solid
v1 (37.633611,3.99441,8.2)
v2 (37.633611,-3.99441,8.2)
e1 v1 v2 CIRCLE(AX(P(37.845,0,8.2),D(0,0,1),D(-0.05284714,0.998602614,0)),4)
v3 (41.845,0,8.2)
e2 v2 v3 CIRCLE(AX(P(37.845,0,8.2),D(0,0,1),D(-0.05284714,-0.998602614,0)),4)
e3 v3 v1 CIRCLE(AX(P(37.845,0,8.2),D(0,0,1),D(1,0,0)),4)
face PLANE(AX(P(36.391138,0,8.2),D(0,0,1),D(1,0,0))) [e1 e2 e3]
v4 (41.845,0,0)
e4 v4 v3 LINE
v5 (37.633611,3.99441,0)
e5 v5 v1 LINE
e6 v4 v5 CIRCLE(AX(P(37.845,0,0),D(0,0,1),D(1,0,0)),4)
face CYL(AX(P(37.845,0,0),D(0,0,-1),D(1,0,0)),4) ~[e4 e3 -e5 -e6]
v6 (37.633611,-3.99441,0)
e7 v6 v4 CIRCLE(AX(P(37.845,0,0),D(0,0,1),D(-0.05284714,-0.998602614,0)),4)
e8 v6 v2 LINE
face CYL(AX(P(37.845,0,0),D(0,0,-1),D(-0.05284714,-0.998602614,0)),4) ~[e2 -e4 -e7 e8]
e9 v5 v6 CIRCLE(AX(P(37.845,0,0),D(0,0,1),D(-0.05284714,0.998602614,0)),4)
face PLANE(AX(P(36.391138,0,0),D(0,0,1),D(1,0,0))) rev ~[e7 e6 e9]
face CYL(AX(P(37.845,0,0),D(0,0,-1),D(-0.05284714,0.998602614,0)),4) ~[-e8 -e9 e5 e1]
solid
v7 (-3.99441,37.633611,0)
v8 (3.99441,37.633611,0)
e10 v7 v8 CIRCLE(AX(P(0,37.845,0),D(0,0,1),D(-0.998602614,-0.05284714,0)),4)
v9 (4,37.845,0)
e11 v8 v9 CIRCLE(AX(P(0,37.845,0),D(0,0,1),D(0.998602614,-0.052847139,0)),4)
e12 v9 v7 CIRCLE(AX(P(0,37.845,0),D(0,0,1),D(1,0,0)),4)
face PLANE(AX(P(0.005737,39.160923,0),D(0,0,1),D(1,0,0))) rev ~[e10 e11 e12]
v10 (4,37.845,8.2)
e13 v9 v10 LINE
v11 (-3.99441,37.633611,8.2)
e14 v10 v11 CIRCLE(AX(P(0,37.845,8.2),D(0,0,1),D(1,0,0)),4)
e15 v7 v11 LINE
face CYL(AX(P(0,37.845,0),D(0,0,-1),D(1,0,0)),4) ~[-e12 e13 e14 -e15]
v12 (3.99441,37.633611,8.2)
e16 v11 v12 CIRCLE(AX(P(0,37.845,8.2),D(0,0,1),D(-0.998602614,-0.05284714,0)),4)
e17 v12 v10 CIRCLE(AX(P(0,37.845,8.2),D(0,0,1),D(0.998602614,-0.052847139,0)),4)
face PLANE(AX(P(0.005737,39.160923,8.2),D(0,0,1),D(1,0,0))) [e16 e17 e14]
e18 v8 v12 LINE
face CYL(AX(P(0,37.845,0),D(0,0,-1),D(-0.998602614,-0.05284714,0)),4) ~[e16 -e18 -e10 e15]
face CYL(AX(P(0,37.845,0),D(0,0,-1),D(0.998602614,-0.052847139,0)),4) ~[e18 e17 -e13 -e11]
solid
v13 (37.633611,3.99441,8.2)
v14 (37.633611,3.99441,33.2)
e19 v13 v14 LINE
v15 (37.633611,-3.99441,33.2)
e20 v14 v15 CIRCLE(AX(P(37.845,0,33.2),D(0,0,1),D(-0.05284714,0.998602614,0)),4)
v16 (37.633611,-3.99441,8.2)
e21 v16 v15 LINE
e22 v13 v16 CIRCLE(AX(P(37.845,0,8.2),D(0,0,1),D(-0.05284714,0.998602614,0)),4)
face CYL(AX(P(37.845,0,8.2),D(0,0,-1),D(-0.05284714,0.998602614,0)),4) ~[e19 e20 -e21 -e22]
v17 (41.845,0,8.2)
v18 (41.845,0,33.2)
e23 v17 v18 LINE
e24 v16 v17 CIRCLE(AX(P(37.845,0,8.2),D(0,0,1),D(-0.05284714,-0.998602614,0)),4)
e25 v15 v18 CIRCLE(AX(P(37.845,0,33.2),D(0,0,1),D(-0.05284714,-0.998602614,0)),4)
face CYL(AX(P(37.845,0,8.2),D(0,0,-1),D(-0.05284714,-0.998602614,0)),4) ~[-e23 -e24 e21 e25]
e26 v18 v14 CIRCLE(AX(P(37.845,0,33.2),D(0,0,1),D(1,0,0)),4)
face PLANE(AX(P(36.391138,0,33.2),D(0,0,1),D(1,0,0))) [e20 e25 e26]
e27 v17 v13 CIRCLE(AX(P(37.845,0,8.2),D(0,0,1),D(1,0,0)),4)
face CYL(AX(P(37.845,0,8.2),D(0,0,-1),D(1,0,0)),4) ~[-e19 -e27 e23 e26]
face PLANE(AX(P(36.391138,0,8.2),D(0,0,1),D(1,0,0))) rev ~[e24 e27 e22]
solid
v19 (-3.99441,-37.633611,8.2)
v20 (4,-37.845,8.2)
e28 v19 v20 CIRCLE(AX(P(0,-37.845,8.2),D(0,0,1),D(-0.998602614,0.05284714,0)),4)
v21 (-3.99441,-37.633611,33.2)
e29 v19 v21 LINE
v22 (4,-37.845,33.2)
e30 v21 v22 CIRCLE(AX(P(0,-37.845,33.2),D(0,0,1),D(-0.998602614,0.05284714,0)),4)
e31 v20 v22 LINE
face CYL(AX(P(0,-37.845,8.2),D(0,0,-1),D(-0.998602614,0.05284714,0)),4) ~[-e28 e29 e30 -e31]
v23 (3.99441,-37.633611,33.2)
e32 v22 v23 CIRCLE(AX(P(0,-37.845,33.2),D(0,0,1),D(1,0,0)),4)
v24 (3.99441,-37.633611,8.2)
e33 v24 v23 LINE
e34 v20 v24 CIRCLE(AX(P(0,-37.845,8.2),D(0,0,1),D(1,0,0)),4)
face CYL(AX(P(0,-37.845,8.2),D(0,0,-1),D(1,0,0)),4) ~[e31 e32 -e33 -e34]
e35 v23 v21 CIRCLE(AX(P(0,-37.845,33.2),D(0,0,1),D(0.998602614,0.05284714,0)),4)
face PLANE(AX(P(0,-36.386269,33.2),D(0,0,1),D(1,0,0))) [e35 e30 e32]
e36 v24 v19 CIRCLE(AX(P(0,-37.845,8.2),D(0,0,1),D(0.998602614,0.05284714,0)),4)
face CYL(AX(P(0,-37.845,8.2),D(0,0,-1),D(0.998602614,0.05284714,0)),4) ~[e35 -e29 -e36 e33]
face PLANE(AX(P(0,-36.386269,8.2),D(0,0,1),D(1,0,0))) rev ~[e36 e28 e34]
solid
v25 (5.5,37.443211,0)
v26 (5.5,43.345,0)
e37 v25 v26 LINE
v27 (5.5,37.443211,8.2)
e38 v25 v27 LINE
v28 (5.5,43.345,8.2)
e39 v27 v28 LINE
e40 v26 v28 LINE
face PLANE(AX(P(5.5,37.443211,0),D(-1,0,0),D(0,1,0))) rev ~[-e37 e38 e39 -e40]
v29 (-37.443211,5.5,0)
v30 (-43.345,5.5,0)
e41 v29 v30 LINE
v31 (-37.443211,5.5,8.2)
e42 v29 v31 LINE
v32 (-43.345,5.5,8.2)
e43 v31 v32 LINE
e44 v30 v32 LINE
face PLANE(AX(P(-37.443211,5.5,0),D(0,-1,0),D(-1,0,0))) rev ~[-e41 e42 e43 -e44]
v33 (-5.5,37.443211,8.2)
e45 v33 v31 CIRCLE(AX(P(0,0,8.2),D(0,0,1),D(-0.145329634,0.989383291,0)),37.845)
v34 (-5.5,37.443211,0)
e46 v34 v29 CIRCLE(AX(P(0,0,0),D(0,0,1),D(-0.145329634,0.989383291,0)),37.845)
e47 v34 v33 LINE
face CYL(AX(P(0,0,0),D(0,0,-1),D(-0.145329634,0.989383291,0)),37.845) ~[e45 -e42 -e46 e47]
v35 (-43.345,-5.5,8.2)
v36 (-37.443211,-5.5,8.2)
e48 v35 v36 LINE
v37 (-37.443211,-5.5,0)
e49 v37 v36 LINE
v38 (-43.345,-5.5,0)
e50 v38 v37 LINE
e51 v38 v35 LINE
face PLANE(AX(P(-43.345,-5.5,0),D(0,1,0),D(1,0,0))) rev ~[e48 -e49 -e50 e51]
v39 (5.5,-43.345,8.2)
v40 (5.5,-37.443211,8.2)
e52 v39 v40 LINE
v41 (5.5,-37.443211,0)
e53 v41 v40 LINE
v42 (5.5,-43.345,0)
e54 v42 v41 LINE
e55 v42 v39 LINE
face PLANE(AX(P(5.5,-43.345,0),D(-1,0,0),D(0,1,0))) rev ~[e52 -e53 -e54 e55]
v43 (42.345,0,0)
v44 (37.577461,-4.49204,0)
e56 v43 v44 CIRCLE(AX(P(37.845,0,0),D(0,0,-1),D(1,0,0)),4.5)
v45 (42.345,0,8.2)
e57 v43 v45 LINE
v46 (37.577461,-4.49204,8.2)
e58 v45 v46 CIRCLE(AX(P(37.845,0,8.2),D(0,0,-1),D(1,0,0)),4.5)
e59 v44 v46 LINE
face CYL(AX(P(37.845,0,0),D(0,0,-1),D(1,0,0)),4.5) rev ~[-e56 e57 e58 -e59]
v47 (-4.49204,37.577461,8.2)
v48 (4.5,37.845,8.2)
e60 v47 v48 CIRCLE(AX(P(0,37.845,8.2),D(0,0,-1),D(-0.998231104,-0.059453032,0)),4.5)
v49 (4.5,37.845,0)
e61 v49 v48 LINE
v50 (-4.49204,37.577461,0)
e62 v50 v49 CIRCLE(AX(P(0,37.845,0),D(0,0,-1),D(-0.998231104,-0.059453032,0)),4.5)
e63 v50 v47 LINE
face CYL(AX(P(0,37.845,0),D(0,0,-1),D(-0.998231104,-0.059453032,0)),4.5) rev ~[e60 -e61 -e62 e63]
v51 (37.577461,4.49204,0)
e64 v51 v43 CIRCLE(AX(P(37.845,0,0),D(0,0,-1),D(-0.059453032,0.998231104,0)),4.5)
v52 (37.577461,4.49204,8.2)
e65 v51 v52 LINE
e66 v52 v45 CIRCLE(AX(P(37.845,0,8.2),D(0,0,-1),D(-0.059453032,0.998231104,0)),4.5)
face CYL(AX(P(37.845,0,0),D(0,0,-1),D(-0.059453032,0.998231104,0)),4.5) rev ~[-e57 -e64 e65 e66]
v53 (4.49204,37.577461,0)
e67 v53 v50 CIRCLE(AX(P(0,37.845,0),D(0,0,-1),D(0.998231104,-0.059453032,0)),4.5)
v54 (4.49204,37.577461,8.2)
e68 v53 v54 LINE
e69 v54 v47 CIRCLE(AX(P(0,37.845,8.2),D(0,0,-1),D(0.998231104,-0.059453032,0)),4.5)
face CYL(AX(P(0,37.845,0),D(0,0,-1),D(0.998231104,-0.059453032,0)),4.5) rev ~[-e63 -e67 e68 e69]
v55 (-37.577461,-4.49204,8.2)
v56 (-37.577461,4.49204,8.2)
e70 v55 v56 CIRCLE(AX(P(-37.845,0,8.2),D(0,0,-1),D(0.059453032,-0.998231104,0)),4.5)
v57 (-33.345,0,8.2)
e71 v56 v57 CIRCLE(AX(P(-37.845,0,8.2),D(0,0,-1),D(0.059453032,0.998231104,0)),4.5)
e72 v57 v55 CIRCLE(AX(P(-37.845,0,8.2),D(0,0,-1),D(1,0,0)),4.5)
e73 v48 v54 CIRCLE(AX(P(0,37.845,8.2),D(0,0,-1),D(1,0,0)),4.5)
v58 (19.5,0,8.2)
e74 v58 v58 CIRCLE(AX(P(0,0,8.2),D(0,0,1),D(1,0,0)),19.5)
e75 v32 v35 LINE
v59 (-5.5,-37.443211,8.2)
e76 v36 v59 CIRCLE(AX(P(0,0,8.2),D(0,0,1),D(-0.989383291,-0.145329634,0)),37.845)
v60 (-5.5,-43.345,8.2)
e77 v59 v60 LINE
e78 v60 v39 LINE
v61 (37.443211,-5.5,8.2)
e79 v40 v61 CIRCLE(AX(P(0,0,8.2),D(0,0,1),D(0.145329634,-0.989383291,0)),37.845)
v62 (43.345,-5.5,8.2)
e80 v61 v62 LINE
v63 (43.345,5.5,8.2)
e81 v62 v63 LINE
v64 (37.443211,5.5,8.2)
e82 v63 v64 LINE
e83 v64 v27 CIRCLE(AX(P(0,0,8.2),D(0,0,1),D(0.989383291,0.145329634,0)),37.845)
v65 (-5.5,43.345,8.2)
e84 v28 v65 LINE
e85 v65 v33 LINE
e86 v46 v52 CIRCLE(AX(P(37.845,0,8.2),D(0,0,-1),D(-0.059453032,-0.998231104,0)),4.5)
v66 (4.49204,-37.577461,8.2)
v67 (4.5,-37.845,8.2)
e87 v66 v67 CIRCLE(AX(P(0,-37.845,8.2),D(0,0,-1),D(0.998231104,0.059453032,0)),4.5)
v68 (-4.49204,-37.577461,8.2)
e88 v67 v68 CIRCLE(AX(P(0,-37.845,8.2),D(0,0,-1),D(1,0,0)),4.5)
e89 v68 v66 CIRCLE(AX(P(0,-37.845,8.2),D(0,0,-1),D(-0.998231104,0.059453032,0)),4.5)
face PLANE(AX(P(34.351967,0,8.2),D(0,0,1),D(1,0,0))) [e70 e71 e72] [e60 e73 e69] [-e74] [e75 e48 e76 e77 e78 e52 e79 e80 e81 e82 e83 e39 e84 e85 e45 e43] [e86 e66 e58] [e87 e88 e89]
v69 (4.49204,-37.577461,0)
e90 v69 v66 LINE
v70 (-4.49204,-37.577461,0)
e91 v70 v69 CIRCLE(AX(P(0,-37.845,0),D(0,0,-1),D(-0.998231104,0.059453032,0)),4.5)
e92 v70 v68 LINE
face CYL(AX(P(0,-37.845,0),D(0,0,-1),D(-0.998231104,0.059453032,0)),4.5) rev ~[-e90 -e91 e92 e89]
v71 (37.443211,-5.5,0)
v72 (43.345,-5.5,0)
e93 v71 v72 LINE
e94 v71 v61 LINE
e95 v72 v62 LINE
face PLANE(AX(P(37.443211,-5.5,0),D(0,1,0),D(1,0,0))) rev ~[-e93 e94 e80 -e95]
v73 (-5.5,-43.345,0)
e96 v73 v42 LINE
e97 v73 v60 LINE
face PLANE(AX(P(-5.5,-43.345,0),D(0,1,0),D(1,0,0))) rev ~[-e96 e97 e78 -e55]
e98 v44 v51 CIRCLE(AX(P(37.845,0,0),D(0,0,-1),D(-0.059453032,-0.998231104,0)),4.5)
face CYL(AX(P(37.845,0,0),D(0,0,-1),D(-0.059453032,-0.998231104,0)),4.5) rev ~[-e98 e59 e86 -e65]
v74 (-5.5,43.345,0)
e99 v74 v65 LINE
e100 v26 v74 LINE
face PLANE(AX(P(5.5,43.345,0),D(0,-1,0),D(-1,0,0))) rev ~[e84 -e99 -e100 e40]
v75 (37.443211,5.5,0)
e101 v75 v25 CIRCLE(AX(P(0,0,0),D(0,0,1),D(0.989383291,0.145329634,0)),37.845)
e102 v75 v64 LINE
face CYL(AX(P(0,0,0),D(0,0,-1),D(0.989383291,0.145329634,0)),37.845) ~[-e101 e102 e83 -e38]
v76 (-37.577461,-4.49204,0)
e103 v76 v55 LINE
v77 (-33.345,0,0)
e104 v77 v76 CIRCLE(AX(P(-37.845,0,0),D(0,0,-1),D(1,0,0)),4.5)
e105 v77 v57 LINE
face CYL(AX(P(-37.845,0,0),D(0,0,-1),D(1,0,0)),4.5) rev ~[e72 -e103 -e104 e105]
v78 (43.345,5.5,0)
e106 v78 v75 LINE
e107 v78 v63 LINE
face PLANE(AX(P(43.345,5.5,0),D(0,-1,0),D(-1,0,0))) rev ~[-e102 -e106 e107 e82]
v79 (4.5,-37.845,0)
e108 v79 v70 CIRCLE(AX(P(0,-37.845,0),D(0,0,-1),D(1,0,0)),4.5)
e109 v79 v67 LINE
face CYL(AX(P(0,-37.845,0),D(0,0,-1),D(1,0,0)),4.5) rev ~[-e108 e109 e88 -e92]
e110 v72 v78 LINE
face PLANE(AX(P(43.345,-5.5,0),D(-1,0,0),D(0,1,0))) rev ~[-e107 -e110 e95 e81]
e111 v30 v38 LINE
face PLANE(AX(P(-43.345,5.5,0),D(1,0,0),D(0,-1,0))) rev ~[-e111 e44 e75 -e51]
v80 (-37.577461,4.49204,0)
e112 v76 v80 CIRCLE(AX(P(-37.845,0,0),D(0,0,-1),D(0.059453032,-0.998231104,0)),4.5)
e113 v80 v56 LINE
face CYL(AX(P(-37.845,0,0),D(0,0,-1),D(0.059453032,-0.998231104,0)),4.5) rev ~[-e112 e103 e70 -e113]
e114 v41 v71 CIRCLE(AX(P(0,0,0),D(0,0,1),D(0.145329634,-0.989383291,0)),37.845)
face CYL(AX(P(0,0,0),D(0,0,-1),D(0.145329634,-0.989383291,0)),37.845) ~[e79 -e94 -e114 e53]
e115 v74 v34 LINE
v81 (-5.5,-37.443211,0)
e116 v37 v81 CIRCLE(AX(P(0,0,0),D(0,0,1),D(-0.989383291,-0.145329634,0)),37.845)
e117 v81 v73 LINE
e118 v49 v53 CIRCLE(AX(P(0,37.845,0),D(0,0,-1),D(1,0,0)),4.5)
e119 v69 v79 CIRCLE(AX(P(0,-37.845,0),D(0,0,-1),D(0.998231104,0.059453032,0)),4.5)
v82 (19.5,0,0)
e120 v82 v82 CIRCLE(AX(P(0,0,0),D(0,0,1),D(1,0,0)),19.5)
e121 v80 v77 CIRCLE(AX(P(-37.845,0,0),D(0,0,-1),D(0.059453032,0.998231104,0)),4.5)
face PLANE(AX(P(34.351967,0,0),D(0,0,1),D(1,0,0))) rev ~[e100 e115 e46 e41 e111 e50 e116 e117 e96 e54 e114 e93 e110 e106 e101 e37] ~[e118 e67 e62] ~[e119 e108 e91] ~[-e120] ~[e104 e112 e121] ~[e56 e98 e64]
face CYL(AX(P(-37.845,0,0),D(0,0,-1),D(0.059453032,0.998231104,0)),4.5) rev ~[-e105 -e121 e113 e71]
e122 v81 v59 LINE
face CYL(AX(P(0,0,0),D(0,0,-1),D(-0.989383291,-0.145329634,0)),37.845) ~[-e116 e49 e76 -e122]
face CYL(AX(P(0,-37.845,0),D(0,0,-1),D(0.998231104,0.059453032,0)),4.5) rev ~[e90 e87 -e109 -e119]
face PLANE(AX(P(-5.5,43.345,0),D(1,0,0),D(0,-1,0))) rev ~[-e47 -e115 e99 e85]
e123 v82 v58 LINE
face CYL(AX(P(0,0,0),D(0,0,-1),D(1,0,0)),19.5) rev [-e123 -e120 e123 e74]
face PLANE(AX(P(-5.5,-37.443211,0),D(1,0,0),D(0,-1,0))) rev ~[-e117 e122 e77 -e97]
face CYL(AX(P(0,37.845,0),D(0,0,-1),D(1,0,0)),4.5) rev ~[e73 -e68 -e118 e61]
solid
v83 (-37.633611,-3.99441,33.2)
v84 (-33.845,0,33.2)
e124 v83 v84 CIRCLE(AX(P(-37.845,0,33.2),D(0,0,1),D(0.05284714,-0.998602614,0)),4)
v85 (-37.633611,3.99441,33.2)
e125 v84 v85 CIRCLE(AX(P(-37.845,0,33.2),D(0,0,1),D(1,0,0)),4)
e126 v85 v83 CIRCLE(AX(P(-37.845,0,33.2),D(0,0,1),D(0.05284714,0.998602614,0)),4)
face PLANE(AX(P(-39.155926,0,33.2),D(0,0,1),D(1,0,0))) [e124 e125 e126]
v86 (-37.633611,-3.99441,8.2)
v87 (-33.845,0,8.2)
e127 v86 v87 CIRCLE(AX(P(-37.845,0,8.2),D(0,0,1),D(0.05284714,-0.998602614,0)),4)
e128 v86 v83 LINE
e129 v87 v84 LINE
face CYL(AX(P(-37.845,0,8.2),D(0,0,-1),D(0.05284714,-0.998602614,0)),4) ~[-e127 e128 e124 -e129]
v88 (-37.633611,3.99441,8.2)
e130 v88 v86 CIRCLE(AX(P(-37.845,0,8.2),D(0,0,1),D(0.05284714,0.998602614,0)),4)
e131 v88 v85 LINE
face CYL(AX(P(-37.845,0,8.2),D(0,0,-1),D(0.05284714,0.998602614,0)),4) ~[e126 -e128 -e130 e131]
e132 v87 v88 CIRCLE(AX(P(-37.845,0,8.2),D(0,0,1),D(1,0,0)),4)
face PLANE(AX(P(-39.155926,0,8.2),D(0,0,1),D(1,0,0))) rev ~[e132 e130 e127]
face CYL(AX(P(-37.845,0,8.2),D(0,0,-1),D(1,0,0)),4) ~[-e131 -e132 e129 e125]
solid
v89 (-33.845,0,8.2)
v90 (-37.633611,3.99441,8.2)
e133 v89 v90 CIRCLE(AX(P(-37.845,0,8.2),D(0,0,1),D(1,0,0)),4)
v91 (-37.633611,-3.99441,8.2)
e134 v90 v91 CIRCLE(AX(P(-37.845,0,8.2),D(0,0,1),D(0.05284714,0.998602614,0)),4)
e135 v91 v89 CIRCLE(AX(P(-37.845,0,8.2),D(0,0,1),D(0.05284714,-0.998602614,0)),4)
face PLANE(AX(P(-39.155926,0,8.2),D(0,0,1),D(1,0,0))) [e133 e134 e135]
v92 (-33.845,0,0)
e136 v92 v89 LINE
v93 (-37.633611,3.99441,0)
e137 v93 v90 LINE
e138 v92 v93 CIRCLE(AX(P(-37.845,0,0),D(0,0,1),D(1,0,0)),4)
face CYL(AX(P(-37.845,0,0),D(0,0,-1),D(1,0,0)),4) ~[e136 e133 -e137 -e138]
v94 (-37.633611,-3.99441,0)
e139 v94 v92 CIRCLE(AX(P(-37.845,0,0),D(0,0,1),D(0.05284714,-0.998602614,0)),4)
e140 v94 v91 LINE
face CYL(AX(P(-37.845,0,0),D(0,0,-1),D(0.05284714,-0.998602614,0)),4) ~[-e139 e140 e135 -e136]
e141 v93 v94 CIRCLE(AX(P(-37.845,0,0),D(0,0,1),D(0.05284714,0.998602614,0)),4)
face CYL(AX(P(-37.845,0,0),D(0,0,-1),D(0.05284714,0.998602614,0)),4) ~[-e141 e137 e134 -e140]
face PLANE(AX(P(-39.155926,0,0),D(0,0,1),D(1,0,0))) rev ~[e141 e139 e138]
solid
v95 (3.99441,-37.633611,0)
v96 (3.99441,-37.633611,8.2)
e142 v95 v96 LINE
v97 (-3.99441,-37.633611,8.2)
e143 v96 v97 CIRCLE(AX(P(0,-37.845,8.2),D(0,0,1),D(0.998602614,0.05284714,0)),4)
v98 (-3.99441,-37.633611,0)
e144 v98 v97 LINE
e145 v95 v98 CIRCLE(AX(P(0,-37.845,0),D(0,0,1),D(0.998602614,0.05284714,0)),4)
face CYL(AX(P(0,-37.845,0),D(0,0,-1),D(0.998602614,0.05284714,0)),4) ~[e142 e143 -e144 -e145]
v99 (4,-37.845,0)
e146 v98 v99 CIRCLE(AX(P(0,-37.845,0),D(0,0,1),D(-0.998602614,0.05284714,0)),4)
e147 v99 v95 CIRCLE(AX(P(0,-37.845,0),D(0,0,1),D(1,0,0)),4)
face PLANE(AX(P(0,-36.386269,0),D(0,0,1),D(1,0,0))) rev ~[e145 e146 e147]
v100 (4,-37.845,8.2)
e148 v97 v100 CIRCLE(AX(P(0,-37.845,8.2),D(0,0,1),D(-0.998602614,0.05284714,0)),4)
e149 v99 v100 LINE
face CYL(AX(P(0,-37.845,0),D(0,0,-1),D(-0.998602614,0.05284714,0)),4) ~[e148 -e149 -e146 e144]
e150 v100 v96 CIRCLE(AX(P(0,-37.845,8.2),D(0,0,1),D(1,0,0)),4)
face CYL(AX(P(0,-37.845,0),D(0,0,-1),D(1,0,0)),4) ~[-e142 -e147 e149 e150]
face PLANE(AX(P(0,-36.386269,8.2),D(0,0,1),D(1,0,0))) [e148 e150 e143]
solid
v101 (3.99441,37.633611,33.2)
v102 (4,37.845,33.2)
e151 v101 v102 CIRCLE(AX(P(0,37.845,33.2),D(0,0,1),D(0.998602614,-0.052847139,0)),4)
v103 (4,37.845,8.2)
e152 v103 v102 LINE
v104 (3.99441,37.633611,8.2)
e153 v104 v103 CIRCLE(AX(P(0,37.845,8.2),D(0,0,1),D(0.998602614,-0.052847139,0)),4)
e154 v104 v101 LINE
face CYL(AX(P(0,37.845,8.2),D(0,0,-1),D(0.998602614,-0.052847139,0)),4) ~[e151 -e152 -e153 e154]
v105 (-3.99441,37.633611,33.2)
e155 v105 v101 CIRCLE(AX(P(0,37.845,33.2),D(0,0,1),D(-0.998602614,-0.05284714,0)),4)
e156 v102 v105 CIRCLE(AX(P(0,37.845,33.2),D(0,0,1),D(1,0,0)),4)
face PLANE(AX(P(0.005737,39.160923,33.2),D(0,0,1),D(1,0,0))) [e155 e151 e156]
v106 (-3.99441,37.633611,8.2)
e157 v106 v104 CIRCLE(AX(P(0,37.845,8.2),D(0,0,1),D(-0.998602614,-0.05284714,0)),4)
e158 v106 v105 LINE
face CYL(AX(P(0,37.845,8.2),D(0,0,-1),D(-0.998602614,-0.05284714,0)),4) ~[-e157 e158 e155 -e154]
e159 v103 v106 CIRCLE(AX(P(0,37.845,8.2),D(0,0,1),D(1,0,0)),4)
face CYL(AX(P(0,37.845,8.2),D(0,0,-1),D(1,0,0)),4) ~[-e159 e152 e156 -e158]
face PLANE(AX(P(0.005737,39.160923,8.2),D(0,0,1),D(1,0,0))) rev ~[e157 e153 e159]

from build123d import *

# Parameters (mm, degrees)
F0_R     = 20
F0_R_2   = 19.5
F1_DEPTH = 8.2
F3_DEPTH = 25


# Not quite as in the source:
# - the program builds the solid bodies; features that only make, move or delete a surface that nothing else refers to are left out


with BuildPart() as f1:
    # F0 (on Top) → F1 (new body)
    with BuildSketch(Plane.XY):
        with BuildLine():
            ThreePointArc((37.5774613555, -4.492039968), (33.345, 0), (37.5774613555, 4.492039968))
            ThreePointArc((37.5774613555, 4.492039968), (37.5137215364, 4.9964709038), (37.4432106663, 5.5))
            Line((37.4432106663, 5.5), (32.345, 5.5))
            Line((32.345, 5.5), (32.345, -5.5))
            Line((32.345, -5.5), (37.4432106663, -5.5))
            ThreePointArc((37.4432106663, -5.5), (37.5137215364, -4.9964709038), (37.5774613555, -4.492039968))
        make_face()
        with BuildLine():
            ThreePointArc((37.4432106663, 5.5), (37.5137215364, 4.9964709038), (37.5774613555, 4.492039968))
            ThreePointArc((37.5774613555, 4.492039968), (40.9309420037, 3.2752041082), (42.345, 0))
            ThreePointArc((42.345, 0), (40.9309420037, -3.2752041082), (37.5774613555, -4.492039968))
            ThreePointArc((37.5774613555, -4.492039968), (37.5137215364, -4.9964709038), (37.4432106663, -5.5))
            Line((37.4432106663, -5.5), (43.345, -5.5))
            Line((43.345, -5.5), (43.345, 5.5))
            Line((43.345, 5.5), (37.4432106663, 5.5))
        make_face()
        with BuildLine():
            Line((32.345, 5.5), (37.4432106663, 5.5))
            ThreePointArc((37.4432106663, 5.5), (26.760456134, 26.760456134), (5.5, 37.4432106663))
            Line((5.5, 37.4432106663), (5.5, 32.345))
            Line((5.5, 32.345), (-5.5, 32.345))
            Line((-5.5, 32.345), (-5.5, 37.4432106663))
            ThreePointArc((-5.5, 37.4432106663), (-26.760456134, 26.760456134), (-37.4432106663, 5.5))
            Line((-37.4432106663, 5.5), (-32.345, 5.5))
            Line((-32.345, 5.5), (-32.345, -5.5))
            Line((-32.345, -5.5), (-37.4432106663, -5.5))
            ThreePointArc((-37.4432106663, -5.5), (-26.760456134, -26.760456134), (-5.5, -37.4432106663))
            Line((-5.5, -37.4432106663), (-5.5, -32.345))
            Line((-5.5, -32.345), (5.5, -32.345))
            Line((5.5, -32.345), (5.5, -37.4432106663))
            ThreePointArc((5.5, -37.4432106663), (26.760456134, -26.760456134), (37.4432106663, -5.5))
            Line((37.4432106663, -5.5), (32.345, -5.5))
            Line((32.345, -5.5), (32.345, 5.5))
        make_face()
        with BuildLine():
            ThreePointArc((23.3205760812, 16.9760053087), (27.4291454667, 8.9261416059), (28.845, 0))
            ThreePointArc((28.845, 0), (27.4291454667, -8.9261416059), (23.3205760812, -16.9760053087))
            ThreePointArc((23.3205760812, -16.9760053087), (24.483570121, -18.5134609029), (24.8964951033, -20.3964951033))
            ThreePointArc((24.8964951033, -20.3964951033), (21.9549873112, -24.6179998158), (16.9760053087, -23.3205760812))
            ThreePointArc((16.9760053087, -23.3205760812), (0, -28.845), (-16.9760053087, -23.3205760812))
            ThreePointArc((-16.9760053087, -23.3205760812), (-23.5784756187, -23.5784756187), (-23.3205760812, -16.9760053087))
            ThreePointArc((-23.3205760812, -16.9760053087), (-28.845, 0), (-23.3205760812, 16.9760053087))
            ThreePointArc((-23.3205760812, 16.9760053087), (-23.5784756187, 23.5784756187), (-16.9760053087, 23.3205760812))
            ThreePointArc((-16.9760053087, 23.3205760812), (0, 28.845), (16.9760053087, 23.3205760812))
            ThreePointArc((16.9760053087, 23.3205760812), (21.9549873112, 24.6179998158), (24.8964951033, 20.3964951033))
            ThreePointArc((24.8964951033, 20.3964951033), (24.483570121, 18.5134609029), (23.3205760812, 16.9760053087))
        make_face(mode=Mode.SUBTRACT)
        with BuildLine():
            Line((5.5, 32.345), (5.5, 37.4432106663))
            ThreePointArc((5.5, 37.4432106663), (4.9964709038, 37.5137215364), (4.492039968, 37.5774613555))
            ThreePointArc((4.492039968, 37.5774613555), (0, 33.345), (-4.492039968, 37.5774613555))
            ThreePointArc((-4.492039968, 37.5774613555), (-4.9964709038, 37.5137215364), (-5.5, 37.4432106663))
            Line((-5.5, 37.4432106663), (-5.5, 32.345))
            Line((-5.5, 32.345), (5.5, 32.345))
        make_face()
        with BuildLine():
            ThreePointArc((4.492039968, 37.5774613555), (4.9964709038, 37.5137215364), (5.5, 37.4432106663))
            Line((5.5, 37.4432106663), (5.5, 43.345))
            Line((5.5, 43.345), (-5.5, 43.345))
            Line((-5.5, 43.345), (-5.5, 37.4432106663))
            ThreePointArc((-5.5, 37.4432106663), (-4.9964709038, 37.5137215364), (-4.492039968, 37.5774613555))
            ThreePointArc((-4.492039968, 37.5774613555), (-0.1338285175, 42.3430095518), (4.5, 37.845))
            ThreePointArc((4.5, 37.845), (4.4980095518, 37.7111714825), (4.492039968, 37.5774613555))
        make_face()
        with BuildLine():
            Line((5.5, -43.345), (5.5, -37.4432106663))
            ThreePointArc((5.5, -37.4432106663), (4.9964709038, -37.5137215364), (4.492039968, -37.5774613555))
            ThreePointArc((4.492039968, -37.5774613555), (4.4980095518, -37.7111714825), (4.5, -37.845))
            ThreePointArc((4.5, -37.845), (-0.1338285175, -42.3430095518), (-4.492039968, -37.5774613555))
            ThreePointArc((-4.492039968, -37.5774613555), (-4.9964709038, -37.5137215364), (-5.5, -37.4432106663))
            Line((-5.5, -37.4432106663), (-5.5, -43.345))
            Line((-5.5, -43.345), (5.5, -43.345))
        make_face()
        with BuildLine():
            ThreePointArc((4.492039968, -37.5774613555), (4.9964709038, -37.5137215364), (5.5, -37.4432106663))
            Line((5.5, -37.4432106663), (5.5, -32.345))
            Line((5.5, -32.345), (-5.5, -32.345))
            Line((-5.5, -32.345), (-5.5, -37.4432106663))
            ThreePointArc((-5.5, -37.4432106663), (-4.9964709038, -37.5137215364), (-4.492039968, -37.5774613555))
            ThreePointArc((-4.492039968, -37.5774613555), (0, -33.345), (4.492039968, -37.5774613555))
        make_face()
        with BuildLine():
            Line((-32.345, 5.5), (-37.4432106663, 5.5))
            ThreePointArc((-37.4432106663, 5.5), (-37.5137215364, 4.9964709038), (-37.5774613555, 4.492039968))
            ThreePointArc((-37.5774613555, 4.492039968), (-34.5697958918, 3.0859420037), (-33.345, 0))
            ThreePointArc((-33.345, 0), (-34.5697958918, -3.0859420037), (-37.5774613555, -4.492039968))
            ThreePointArc((-37.5774613555, -4.492039968), (-37.5137215364, -4.9964709038), (-37.4432106663, -5.5))
            Line((-37.4432106663, -5.5), (-32.345, -5.5))
            Line((-32.345, -5.5), (-32.345, 5.5))
        make_face()
        with BuildLine():
            ThreePointArc((-37.5774613555, 4.492039968), (-37.5137215364, 4.9964709038), (-37.4432106663, 5.5))
            Line((-37.4432106663, 5.5), (-43.345, 5.5))
            Line((-43.345, 5.5), (-43.345, -5.5))
            Line((-43.345, -5.5), (-37.4432106663, -5.5))
            ThreePointArc((-37.4432106663, -5.5), (-37.5137215364, -4.9964709038), (-37.5774613555, -4.492039968))
            ThreePointArc((-37.5774613555, -4.492039968), (-42.345, 0), (-37.5774613555, 4.492039968))
        make_face()
        with BuildLine():
            ThreePointArc((-23.3205760812, 16.9760053087), (-20.3964951033, 20.3964951033), (-16.9760053087, 23.3205760812))
            ThreePointArc((-16.9760053087, 23.3205760812), (-23.5784756187, 23.5784756187), (-23.3205760812, 16.9760053087))
        make_face()
        with BuildLine():
            ThreePointArc((16.9760053087, 23.3205760812), (20.3964951033, 20.3964951033), (23.3205760812, 16.9760053087))
            ThreePointArc((23.3205760812, 16.9760053087), (24.483570121, 18.5134609029), (24.8964951033, 20.3964951033))
            ThreePointArc((24.8964951033, 20.3964951033), (21.9549873112, 24.6179998158), (16.9760053087, 23.3205760812))
        make_face()
        with BuildLine():
            ThreePointArc((24.8964951033, -20.3964951033), (24.483570121, -18.5134609029), (23.3205760812, -16.9760053087))
            ThreePointArc((23.3205760812, -16.9760053087), (20.3964951033, -20.3964951033), (16.9760053087, -23.3205760812))
            ThreePointArc((16.9760053087, -23.3205760812), (21.9549873112, -24.6179998158), (24.8964951033, -20.3964951033))
        make_face()
        with BuildLine():
            ThreePointArc((-23.3205760812, -16.9760053087), (-23.5784756187, -23.5784756187), (-16.9760053087, -23.3205760812))
            ThreePointArc((-16.9760053087, -23.3205760812), (-20.3964951033, -20.3964951033), (-23.3205760812, -16.9760053087))
        make_face()
        with BuildLine():
            ThreePointArc((23.3205760812, -16.9760053087), (27.4291454667, -8.9261416059), (28.845, 0))
            ThreePointArc((28.845, 0), (27.4291454667, 8.9261416059), (23.3205760812, 16.9760053087))
            ThreePointArc((23.3205760812, 16.9760053087), (17.214514588, 17.214514588), (16.9760053087, 23.3205760812))
            ThreePointArc((16.9760053087, 23.3205760812), (0, 28.845), (-16.9760053087, 23.3205760812))
            ThreePointArc((-16.9760053087, 23.3205760812), (-16.1749903908, 21.9549873112), (-15.8964951033, 20.3964951033))
            ThreePointArc((-15.8964951033, 20.3964951033), (-18.5134609029, 16.3094200856), (-23.3205760812, 16.9760053087))
            ThreePointArc((-23.3205760812, 16.9760053087), (-28.845, 0), (-23.3205760812, -16.9760053087))
            ThreePointArc((-23.3205760812, -16.9760053087), (-18.5134609029, -16.3094200856), (-15.8964951033, -20.3964951033))
            ThreePointArc((-15.8964951033, -20.3964951033), (-16.1749903908, -21.9549873112), (-16.9760053087, -23.3205760812))
            ThreePointArc((-16.9760053087, -23.3205760812), (0, -28.845), (16.9760053087, -23.3205760812))
            ThreePointArc((16.9760053087, -23.3205760812), (17.214514588, -17.214514588), (23.3205760812, -16.9760053087))
        make_face()
        Circle(F0_R, mode=Mode.SUBTRACT)
        with BuildLine():
            ThreePointArc((16.9760053087, -23.3205760812), (20.3964951033, -20.3964951033), (23.3205760812, -16.9760053087))
            ThreePointArc((23.3205760812, -16.9760053087), (17.214514588, -17.214514588), (16.9760053087, -23.3205760812))
        make_face()
        with BuildLine():
            ThreePointArc((16.9760053087, 23.3205760812), (17.214514588, 17.214514588), (23.3205760812, 16.9760053087))
            ThreePointArc((23.3205760812, 16.9760053087), (20.3964951033, 20.3964951033), (16.9760053087, 23.3205760812))
        make_face()
        with BuildLine():
            ThreePointArc((-15.8964951033, 20.3964951033), (-16.1749903908, 21.9549873112), (-16.9760053087, 23.3205760812))
            ThreePointArc((-16.9760053087, 23.3205760812), (-20.3964951033, 20.3964951033), (-23.3205760812, 16.9760053087))
            ThreePointArc((-23.3205760812, 16.9760053087), (-18.5134609029, 16.3094200856), (-15.8964951033, 20.3964951033))
        make_face()
        with BuildLine():
            ThreePointArc((-23.3205760812, -16.9760053087), (-20.3964951033, -20.3964951033), (-16.9760053087, -23.3205760812))
            ThreePointArc((-16.9760053087, -23.3205760812), (-16.1749903908, -21.9549873112), (-15.8964951033, -20.3964951033))
            ThreePointArc((-15.8964951033, -20.3964951033), (-18.5134609029, -16.3094200856), (-23.3205760812, -16.9760053087))
        make_face()
        Circle(F0_R)
        Circle(F0_R_2, mode=Mode.SUBTRACT)
    extrude(amount=F1_DEPTH)


with BuildPart() as f1b:
    # F0 (on Top) → F1, piece 2 (new body)
    with BuildSketch(Plane.XY):
        with BuildLine():
            ThreePointArc((-37.6336114414, -3.9944104543), (-37.845, 0), (-37.6336114414, 3.9944104543))
            ThreePointArc((-37.6336114414, 3.9944104543), (-41.845, 0), (-37.6336114414, -3.9944104543))
        make_face()
        with BuildLine():
            ThreePointArc((-33.845, 0), (-34.9427978848, 2.7526755862), (-37.6336114414, 3.9944104543))
            ThreePointArc((-37.6336114414, 3.9944104543), (-37.845, 0), (-37.6336114414, -3.9944104543))
            ThreePointArc((-37.6336114414, -3.9944104543), (-34.9427978848, -2.7526755862), (-33.845, 0))
        make_face()
    extrude(amount=F1_DEPTH)


with BuildPart() as f1c:
    # F0 (on Top) → F1, piece 3 (new body)
    with BuildSketch(Plane.XY):
        with BuildLine():
            ThreePointArc((-3.9944104543, 37.6336114414), (0, 37.845), (3.9944104543, 37.6336114414))
            ThreePointArc((3.9944104543, 37.6336114414), (3.9986023694, 37.7392687774), (4, 37.845))
            ThreePointArc((4, 37.845), (-0.1057312226, 41.8436023694), (-3.9944104543, 37.6336114414))
        make_face()
        with BuildLine():
            ThreePointArc((-3.9944104543, 37.6336114414), (0, 33.845), (3.9944104543, 37.6336114414))
            ThreePointArc((3.9944104543, 37.6336114414), (0, 37.845), (-3.9944104543, 37.6336114414))
        make_face()
    extrude(amount=F1_DEPTH)


with BuildPart() as f1d:
    # F0 (on Top) → F1, piece 4 (new body)
    with BuildSketch(Plane.XY):
        with BuildLine():
            ThreePointArc((37.6336114414, -3.9944104543), (37.7921159106, -2), (37.845, 0))
            ThreePointArc((37.845, 0), (37.7921159106, 2), (37.6336114414, 3.9944104543))
            ThreePointArc((37.6336114414, 3.9944104543), (33.845, 0), (37.6336114414, -3.9944104543))
        make_face()
        with BuildLine():
            ThreePointArc((37.6336114414, 3.9944104543), (37.7921159106, 2), (37.845, 0))
            ThreePointArc((37.845, 0), (37.7921159106, -2), (37.6336114414, -3.9944104543))
            ThreePointArc((37.6336114414, -3.9944104543), (40.5976755862, -2.9022021152), (41.845, 0))
            ThreePointArc((41.845, 0), (40.5976755862, 2.9022021152), (37.6336114414, 3.9944104543))
        make_face()
    extrude(amount=F1_DEPTH)


with BuildPart() as f1e:
    # F0 (on Top) → F1, piece 5 (new body)
    with BuildSketch(Plane.XY):
        with BuildLine():
            ThreePointArc((-3.9944104543, -37.6336114414), (0, -37.845), (3.9944104543, -37.6336114414))
            ThreePointArc((3.9944104543, -37.6336114414), (0, -33.845), (-3.9944104543, -37.6336114414))
        make_face()
        with BuildLine():
            ThreePointArc((4, -37.845), (3.9986023694, -37.7392687774), (3.9944104543, -37.6336114414))
            ThreePointArc((3.9944104543, -37.6336114414), (0, -37.845), (-3.9944104543, -37.6336114414))
            ThreePointArc((-3.9944104543, -37.6336114414), (-0.1057312226, -41.8436023694), (4, -37.845))
        make_face()
    extrude(amount=F1_DEPTH)


with BuildPart() as f3:
    # F3 (new): a face of the model
    f3_faces = [f1c.part.faces().sort_by_distance(p)[0] for p in [
        (0, 37.845, 8.2),
    ]]
    extrude(f3_faces, amount=F3_DEPTH)


with BuildPart() as f3b:
    # F3#2 (new): a face of the model
    f3_2_faces = [f1b.part.faces().sort_by_distance(p)[0] for p in [
        (-37.845, 0, 8.2),
    ]]
    extrude(f3_2_faces, amount=F3_DEPTH)


with BuildPart() as f3c:
    # F3#3 (new): a face of the model
    f3_3_faces = [f1d.part.faces().sort_by_distance(p)[0] for p in [
        (37.845, 0, 8.2),
    ]]
    extrude(f3_3_faces, amount=F3_DEPTH)


with BuildPart() as f3d:
    # F3#4 (new): a face of the model
    f3_4_faces = [f1e.part.faces().sort_by_distance(p)[0] for p in [
        (0, -37.845, 8.2),
    ]]
    extrude(f3_4_faces, amount=F3_DEPTH)


solid = Compound([f1.part, f1b.part, f1c.part, f1d.part, f1e.part, f3.part, f3b.part, f3c.part, f3d.part])
